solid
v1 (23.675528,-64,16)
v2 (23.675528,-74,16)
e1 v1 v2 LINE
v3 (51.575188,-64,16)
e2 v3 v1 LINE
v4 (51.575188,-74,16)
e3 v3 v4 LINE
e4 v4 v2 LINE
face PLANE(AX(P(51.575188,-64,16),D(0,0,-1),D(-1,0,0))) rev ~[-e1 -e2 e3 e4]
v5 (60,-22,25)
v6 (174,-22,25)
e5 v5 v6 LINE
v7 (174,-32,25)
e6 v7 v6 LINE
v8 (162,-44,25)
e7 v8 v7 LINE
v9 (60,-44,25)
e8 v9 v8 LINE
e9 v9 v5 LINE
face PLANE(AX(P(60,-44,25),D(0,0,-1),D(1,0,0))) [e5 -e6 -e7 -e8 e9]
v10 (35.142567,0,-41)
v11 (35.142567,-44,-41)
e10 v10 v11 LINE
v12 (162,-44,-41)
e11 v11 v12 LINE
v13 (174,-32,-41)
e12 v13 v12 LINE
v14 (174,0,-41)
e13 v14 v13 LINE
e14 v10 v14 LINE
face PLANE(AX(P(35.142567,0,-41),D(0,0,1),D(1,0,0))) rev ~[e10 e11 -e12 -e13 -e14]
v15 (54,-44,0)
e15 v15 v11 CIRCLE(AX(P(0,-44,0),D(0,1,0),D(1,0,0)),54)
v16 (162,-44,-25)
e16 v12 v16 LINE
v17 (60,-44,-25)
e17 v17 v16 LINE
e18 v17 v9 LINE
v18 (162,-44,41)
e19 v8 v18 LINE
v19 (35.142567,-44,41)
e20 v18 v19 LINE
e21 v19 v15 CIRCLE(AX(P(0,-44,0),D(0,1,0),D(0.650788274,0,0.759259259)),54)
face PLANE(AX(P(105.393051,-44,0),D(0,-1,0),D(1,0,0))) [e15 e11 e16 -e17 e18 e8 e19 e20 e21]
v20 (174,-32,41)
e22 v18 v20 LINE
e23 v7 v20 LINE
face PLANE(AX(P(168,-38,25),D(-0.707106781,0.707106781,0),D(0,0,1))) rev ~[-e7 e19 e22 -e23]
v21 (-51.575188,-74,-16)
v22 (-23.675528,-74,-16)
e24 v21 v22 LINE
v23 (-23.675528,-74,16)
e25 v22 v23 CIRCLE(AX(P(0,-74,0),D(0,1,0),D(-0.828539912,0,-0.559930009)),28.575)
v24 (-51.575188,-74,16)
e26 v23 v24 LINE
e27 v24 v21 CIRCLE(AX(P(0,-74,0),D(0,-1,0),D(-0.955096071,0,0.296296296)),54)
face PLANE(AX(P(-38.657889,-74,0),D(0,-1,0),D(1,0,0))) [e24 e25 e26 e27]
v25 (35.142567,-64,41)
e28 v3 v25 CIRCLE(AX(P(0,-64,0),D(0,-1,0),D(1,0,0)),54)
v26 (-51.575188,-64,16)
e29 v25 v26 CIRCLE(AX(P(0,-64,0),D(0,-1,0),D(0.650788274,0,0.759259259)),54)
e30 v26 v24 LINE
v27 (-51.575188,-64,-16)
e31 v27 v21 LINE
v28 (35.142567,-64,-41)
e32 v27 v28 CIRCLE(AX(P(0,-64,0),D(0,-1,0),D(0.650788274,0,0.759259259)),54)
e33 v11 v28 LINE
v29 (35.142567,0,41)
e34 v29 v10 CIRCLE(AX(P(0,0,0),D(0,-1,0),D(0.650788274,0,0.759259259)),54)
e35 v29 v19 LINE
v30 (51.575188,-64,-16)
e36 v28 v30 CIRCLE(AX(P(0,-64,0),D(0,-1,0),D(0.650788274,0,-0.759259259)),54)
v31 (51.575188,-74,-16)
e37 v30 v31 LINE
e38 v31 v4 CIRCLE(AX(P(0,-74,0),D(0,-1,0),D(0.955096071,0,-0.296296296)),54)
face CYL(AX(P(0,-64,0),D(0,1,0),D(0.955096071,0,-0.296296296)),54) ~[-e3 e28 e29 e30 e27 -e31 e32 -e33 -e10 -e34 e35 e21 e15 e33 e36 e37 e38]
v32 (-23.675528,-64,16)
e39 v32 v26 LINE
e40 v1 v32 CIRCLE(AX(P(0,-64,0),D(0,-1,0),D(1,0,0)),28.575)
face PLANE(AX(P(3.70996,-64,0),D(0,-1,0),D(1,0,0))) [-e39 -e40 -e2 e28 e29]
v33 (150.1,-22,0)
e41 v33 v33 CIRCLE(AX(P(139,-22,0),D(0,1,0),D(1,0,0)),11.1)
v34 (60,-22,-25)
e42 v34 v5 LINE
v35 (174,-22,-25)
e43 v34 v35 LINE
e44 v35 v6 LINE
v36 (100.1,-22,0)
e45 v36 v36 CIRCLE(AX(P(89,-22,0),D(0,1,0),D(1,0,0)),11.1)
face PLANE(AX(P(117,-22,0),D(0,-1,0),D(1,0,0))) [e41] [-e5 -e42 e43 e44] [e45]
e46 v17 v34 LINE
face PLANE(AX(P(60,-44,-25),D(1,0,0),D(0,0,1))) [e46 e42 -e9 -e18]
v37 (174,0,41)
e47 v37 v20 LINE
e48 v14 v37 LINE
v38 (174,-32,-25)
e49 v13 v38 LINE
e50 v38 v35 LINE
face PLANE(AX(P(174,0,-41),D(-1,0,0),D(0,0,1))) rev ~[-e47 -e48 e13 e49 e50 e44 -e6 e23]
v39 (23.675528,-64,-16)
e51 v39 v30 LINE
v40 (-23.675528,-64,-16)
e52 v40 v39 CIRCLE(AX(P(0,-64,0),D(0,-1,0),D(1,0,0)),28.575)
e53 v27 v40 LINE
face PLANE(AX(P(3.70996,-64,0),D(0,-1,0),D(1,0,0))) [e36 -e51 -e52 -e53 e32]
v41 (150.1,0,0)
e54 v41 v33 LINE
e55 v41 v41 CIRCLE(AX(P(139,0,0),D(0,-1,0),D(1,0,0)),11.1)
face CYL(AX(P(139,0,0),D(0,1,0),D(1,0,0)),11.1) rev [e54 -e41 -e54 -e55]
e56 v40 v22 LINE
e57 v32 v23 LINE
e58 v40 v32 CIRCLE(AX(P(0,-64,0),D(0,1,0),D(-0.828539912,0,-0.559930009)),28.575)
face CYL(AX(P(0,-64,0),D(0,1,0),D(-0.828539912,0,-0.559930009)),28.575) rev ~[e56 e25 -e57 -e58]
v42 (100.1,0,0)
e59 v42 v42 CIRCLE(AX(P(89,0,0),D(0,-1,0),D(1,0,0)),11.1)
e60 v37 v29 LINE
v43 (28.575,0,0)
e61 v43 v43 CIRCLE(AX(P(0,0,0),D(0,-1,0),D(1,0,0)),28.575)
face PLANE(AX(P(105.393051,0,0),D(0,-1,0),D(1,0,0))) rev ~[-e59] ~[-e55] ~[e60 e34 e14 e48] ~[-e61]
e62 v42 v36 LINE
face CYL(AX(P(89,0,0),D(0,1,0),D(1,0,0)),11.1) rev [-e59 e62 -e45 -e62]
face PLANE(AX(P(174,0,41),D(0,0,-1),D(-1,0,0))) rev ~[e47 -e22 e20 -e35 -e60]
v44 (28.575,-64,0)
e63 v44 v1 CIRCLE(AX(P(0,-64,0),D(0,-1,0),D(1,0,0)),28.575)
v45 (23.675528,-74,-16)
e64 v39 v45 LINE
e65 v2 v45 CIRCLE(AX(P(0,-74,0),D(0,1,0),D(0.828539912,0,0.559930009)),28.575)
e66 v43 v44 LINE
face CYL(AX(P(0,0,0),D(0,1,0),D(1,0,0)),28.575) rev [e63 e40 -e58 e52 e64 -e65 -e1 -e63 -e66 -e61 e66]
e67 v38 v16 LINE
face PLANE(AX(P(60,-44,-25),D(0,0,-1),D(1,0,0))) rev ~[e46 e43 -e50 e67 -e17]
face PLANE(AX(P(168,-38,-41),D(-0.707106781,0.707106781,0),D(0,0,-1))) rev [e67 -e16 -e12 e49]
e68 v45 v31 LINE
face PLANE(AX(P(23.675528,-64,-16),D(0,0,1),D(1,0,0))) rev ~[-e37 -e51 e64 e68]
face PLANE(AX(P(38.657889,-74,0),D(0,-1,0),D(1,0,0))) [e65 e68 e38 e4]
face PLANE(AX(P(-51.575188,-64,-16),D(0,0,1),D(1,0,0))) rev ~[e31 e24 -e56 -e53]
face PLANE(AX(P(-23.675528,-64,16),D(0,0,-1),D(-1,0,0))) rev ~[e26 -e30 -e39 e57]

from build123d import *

# Parameters (mm, degrees)
F0_R     = 28.575
F1_DEPTH = 64
F0_R_2   = 11.1
F2_DEPTH = 44
F3_W     = 114
F3_H     = 50
F4_DEPTH = 22
F5_SIZE  = 12
F7_DEPTH = 10
F8_SIZE  = 12


# Not quite as in the source:
# - after a boolean that leaves OpenCascade's solid faulty, fix() repairs it


with BuildPart() as f1:
    # F0 (on Front) → F1 (new body)
    with BuildSketch(Plane.XZ):
        with BuildLine():
            ThreePointArc((35.1425667816, -41), (49.0596504584, -22.5643678594), (54, 0))
            ThreePointArc((54, 0), (49.0596504584, 22.5643678594), (35.1425667816, 41))
            ThreePointArc((35.1425667816, 41), (-54, 0), (35.1425667816, -41))
        make_face()
        Circle(F0_R, mode=Mode.SUBTRACT)
    extrude(amount=F1_DEPTH)

    # F0 (on Front) → F2 (join)
    with BuildSketch(Plane.XZ):
        with BuildLine():
            ThreePointArc((35.1425667816, 41), (49.0596504584, 22.5643678594), (54, 0))
            ThreePointArc((54, 0), (49.0596504584, -22.5643678594), (35.1425667816, -41))
            Line((35.1425667816, -41), (174, -41))
            Line((174, -41), (174, 41))
            Line((174, 41), (35.1425667816, 41))
        make_face()
        with Locations((89, 0)):
            Circle(F0_R_2, mode=Mode.SUBTRACT)
        with Locations((139, 0)):
            Circle(F0_R_2, mode=Mode.SUBTRACT)
    extrude(amount=F2_DEPTH)

    # F3 (on face) → F4 (cut)
    with BuildSketch(Plane.XZ.offset(44)):
        with Locations((117, 0)):
            Rectangle(F3_W, F3_H)
    extrude(amount=-F4_DEPTH, mode=Mode.SUBTRACT)

    # F5
    f5_edges = [f1.edges().sort_by_distance(p)[0] for p in [
        (174, -44, -33),
    ]]
    chamfer(f5_edges, length=F5_SIZE)

    # F6 (on face) → F7 (join)
    with BuildSketch(Plane.XZ.offset(64)):
        with BuildLine():
            Line((-23.6755279772, 16), (-51.5751878329, 16))
            ThreePointArc((-51.5751878329, 16), (-54, 0), (-51.5751878329, -16))
            Line((-51.5751878329, -16), (-23.6755279772, -16))
            ThreePointArc((-23.6755279772, -16), (-28.575, 0), (-23.6755279772, 16))
        make_face()
        with BuildLine():
            Line((51.5751878329, 16), (23.6755279772, 16))
            ThreePointArc((23.6755279772, 16), (28.575, 0), (23.6755279772, -16))
            Line((23.6755279772, -16), (51.5751878329, -16))
            ThreePointArc((51.5751878329, -16), (54, 0), (51.5751878329, 16))
        make_face()
    extrude(amount=F7_DEPTH)

    add(f1.part.fix(), mode=Mode.REPLACE)

    # F8
    f8_edges = [f1.edges().sort_by_distance(p)[0] for p in [
        (174, -44, 33),
    ]]
    chamfer(f8_edges, length=F8_SIZE)


solid = f1.part
